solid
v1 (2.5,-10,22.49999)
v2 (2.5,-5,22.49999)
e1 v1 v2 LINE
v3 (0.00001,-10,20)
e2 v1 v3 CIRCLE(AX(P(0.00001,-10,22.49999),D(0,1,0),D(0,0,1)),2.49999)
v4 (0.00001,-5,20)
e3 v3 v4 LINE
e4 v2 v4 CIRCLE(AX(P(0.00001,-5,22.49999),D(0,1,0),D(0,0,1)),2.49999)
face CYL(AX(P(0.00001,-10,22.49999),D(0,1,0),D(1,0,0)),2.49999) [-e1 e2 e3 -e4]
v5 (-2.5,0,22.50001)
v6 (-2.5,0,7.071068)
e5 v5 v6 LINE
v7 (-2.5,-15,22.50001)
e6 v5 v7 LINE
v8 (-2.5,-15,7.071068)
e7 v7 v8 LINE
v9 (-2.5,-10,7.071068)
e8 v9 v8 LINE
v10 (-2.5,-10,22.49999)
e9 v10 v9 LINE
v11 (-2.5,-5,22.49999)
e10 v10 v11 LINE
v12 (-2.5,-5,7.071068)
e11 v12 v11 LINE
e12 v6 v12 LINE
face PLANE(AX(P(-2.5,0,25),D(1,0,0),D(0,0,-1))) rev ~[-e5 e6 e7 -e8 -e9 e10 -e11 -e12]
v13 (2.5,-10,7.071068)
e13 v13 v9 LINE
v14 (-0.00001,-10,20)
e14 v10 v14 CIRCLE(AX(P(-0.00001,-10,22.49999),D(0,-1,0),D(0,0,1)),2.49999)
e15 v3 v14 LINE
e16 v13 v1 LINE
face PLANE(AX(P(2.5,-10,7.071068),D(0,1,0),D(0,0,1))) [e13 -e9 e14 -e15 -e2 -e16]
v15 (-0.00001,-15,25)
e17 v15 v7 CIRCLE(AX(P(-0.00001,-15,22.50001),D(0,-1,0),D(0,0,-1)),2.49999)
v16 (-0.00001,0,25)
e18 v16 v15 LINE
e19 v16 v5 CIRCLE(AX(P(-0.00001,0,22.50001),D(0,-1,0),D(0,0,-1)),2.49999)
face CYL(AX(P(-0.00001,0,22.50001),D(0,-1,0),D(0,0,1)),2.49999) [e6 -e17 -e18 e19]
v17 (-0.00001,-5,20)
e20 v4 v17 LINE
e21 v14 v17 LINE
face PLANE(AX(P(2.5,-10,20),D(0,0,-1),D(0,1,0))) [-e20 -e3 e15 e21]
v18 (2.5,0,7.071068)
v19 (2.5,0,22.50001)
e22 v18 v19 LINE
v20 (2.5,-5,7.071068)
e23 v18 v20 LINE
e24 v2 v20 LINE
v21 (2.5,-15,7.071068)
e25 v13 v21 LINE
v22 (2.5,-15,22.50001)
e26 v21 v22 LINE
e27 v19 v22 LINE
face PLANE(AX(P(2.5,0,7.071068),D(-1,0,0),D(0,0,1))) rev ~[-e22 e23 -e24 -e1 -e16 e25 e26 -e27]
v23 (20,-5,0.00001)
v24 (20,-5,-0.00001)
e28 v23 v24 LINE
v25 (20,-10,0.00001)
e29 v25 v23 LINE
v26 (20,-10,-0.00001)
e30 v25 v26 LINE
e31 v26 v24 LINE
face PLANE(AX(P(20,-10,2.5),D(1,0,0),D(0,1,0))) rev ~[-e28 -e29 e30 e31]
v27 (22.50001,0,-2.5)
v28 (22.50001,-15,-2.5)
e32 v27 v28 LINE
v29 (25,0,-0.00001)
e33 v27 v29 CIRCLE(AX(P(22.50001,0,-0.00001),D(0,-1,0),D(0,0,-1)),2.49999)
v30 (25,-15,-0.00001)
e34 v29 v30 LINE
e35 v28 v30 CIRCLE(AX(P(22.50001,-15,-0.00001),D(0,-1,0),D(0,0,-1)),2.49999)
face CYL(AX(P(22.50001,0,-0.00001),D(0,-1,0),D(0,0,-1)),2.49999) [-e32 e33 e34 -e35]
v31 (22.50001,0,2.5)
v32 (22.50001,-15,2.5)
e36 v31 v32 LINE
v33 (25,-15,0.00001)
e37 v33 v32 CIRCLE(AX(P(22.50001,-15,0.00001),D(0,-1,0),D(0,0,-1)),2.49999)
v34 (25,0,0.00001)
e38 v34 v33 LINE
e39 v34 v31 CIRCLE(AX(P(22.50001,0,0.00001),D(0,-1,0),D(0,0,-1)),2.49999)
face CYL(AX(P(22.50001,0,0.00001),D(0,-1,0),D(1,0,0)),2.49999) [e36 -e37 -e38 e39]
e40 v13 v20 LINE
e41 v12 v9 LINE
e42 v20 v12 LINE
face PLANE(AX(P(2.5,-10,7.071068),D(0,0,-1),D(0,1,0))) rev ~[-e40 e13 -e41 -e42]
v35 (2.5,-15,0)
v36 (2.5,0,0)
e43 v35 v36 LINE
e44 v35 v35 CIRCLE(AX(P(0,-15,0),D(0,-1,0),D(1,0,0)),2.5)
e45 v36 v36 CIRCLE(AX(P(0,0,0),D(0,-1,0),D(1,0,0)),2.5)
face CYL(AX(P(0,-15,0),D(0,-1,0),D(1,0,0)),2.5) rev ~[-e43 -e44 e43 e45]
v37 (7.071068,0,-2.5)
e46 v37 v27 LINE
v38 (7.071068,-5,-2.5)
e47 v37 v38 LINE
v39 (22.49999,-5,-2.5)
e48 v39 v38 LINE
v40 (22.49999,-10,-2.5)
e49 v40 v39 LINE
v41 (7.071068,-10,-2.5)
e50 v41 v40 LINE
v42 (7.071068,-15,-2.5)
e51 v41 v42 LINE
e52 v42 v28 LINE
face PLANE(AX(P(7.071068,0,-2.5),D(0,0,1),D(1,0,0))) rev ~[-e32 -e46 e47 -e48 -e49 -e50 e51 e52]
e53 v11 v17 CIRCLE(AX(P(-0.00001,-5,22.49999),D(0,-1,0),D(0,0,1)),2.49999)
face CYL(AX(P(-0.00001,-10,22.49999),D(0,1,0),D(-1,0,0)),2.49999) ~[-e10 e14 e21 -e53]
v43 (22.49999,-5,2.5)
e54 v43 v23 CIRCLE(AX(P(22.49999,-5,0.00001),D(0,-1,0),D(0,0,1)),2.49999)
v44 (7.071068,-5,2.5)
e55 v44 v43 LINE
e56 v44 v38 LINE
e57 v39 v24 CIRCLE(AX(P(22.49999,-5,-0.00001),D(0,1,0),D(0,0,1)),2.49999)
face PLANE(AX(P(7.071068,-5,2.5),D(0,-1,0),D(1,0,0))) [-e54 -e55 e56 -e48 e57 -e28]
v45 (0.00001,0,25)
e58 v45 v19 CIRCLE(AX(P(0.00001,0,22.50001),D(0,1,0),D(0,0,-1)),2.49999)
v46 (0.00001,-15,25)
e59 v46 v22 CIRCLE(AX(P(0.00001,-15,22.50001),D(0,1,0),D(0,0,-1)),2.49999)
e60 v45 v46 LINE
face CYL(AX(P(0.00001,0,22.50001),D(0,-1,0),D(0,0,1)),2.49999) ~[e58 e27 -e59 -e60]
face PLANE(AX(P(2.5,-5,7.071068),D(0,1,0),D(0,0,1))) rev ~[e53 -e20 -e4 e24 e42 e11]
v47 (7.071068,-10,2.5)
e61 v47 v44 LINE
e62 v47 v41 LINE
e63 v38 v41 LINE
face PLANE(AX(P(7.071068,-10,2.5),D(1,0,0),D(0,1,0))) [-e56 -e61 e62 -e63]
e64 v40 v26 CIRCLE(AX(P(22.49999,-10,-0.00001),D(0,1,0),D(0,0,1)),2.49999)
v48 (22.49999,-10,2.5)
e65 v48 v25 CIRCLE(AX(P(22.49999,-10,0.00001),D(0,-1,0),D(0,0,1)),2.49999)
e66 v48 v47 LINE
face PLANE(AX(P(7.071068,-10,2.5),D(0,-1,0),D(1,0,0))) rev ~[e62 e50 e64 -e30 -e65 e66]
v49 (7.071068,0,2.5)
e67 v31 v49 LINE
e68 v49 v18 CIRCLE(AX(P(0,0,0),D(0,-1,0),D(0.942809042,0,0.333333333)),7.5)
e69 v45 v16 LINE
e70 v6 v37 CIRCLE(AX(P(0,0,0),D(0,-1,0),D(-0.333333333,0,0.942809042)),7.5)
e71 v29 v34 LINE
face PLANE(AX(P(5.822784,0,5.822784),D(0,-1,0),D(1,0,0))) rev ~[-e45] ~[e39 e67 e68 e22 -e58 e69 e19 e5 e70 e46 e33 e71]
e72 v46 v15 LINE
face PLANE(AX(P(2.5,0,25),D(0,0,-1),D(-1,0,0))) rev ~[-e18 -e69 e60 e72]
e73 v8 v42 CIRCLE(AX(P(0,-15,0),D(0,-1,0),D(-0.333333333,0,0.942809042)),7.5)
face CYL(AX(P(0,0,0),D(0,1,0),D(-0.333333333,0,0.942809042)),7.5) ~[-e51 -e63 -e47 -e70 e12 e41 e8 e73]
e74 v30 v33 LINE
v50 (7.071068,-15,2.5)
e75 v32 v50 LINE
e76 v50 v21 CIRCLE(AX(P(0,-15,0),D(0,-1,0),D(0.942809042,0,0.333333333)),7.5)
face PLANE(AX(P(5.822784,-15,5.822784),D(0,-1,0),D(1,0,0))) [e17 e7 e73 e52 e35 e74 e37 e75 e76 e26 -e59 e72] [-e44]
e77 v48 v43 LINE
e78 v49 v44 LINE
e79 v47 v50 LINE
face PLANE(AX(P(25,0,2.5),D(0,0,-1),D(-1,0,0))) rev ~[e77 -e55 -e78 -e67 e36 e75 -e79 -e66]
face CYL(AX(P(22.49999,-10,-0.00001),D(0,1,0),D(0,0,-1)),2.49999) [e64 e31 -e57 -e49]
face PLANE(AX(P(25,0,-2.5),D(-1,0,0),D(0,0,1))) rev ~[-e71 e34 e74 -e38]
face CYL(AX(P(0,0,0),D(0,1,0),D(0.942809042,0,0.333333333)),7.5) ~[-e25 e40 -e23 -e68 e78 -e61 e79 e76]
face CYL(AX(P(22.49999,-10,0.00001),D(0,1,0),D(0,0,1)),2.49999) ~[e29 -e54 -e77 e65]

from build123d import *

# Parameters (mm, degrees)
F1_DEPTH = 15
F2_W     = 5
F2_H     = 12.9289321881
F3_DEPTH = 25
F4_W     = 12.9289321881
F4_H     = 5
F5_DEPTH = 25
F6_R     = 2.49999
F7_R     = 2.5
F8_DEPTH = 25


# Not quite as in the source:
# - a fillet or chamfer is up to 0.001 mm smaller than in the source, because OpenCascade refuses the exact size


with BuildPart() as f1:
    # F0 (on Front) → F1 (new body)
    with BuildSketch(Plane.XZ):
        with BuildLine():
            Line((2.5, 25), (-2.5, 25))
            Line((-2.5, 25), (-2.5, 7.0710678119))
            ThreePointArc((-2.5, 7.0710678119), (-5.3033008589, -5.3033008589), (7.0710678119, -2.5))
            Line((7.0710678119, -2.5), (25, -2.5))
            Line((25, -2.5), (25, 2.5))
            Line((25, 2.5), (7.0710678119, 2.5))
            ThreePointArc((7.0710678119, 2.5), (5.3033008589, 5.3033008589), (2.5, 7.0710678119))
            Line((2.5, 7.0710678119), (2.5, 25))
        make_face()
    extrude(amount=F1_DEPTH)

    # F2 (on face) → F3 (cut)
    with BuildSketch(Plane.YZ.offset(2.5)):
        with Locations((-7.5, 13.5355339059)):
            Rectangle(F2_W, F2_H)
    extrude(amount=-F3_DEPTH, mode=Mode.SUBTRACT)

    # F4 (on face) → F5 (cut)
    with BuildSketch(Plane.XY.offset(2.5)):
        with Locations((13.5355339059, -7.5)):
            Rectangle(F4_W, F4_H)
    extrude(amount=-F5_DEPTH, mode=Mode.SUBTRACT)

    # F6 (radius 2.5 in the source; OpenCascade refuses exactly that, so slightly less here)
    f6_edges = [f1.edges().sort_by_distance(p)[0] for p in [
        (-2.5, -7.5, 25),
        (2.5, -7.5, 25),
        (-2.5, -7.5, 20),
        (2.5, -7.5, 20),
        (25, -7.5, -2.5),
        (25, -7.5, 2.5),
        (20, -7.5, -2.5),
        (20, -7.5, 2.5),
    ]]
    fillet(f6_edges, radius=F6_R)

    # F7 (on face) → F8 (cut)
    with BuildSketch(Plane.XZ.offset(15)):
        Circle(F7_R)
    extrude(amount=-F8_DEPTH, mode=Mode.SUBTRACT)


solid = f1.part
